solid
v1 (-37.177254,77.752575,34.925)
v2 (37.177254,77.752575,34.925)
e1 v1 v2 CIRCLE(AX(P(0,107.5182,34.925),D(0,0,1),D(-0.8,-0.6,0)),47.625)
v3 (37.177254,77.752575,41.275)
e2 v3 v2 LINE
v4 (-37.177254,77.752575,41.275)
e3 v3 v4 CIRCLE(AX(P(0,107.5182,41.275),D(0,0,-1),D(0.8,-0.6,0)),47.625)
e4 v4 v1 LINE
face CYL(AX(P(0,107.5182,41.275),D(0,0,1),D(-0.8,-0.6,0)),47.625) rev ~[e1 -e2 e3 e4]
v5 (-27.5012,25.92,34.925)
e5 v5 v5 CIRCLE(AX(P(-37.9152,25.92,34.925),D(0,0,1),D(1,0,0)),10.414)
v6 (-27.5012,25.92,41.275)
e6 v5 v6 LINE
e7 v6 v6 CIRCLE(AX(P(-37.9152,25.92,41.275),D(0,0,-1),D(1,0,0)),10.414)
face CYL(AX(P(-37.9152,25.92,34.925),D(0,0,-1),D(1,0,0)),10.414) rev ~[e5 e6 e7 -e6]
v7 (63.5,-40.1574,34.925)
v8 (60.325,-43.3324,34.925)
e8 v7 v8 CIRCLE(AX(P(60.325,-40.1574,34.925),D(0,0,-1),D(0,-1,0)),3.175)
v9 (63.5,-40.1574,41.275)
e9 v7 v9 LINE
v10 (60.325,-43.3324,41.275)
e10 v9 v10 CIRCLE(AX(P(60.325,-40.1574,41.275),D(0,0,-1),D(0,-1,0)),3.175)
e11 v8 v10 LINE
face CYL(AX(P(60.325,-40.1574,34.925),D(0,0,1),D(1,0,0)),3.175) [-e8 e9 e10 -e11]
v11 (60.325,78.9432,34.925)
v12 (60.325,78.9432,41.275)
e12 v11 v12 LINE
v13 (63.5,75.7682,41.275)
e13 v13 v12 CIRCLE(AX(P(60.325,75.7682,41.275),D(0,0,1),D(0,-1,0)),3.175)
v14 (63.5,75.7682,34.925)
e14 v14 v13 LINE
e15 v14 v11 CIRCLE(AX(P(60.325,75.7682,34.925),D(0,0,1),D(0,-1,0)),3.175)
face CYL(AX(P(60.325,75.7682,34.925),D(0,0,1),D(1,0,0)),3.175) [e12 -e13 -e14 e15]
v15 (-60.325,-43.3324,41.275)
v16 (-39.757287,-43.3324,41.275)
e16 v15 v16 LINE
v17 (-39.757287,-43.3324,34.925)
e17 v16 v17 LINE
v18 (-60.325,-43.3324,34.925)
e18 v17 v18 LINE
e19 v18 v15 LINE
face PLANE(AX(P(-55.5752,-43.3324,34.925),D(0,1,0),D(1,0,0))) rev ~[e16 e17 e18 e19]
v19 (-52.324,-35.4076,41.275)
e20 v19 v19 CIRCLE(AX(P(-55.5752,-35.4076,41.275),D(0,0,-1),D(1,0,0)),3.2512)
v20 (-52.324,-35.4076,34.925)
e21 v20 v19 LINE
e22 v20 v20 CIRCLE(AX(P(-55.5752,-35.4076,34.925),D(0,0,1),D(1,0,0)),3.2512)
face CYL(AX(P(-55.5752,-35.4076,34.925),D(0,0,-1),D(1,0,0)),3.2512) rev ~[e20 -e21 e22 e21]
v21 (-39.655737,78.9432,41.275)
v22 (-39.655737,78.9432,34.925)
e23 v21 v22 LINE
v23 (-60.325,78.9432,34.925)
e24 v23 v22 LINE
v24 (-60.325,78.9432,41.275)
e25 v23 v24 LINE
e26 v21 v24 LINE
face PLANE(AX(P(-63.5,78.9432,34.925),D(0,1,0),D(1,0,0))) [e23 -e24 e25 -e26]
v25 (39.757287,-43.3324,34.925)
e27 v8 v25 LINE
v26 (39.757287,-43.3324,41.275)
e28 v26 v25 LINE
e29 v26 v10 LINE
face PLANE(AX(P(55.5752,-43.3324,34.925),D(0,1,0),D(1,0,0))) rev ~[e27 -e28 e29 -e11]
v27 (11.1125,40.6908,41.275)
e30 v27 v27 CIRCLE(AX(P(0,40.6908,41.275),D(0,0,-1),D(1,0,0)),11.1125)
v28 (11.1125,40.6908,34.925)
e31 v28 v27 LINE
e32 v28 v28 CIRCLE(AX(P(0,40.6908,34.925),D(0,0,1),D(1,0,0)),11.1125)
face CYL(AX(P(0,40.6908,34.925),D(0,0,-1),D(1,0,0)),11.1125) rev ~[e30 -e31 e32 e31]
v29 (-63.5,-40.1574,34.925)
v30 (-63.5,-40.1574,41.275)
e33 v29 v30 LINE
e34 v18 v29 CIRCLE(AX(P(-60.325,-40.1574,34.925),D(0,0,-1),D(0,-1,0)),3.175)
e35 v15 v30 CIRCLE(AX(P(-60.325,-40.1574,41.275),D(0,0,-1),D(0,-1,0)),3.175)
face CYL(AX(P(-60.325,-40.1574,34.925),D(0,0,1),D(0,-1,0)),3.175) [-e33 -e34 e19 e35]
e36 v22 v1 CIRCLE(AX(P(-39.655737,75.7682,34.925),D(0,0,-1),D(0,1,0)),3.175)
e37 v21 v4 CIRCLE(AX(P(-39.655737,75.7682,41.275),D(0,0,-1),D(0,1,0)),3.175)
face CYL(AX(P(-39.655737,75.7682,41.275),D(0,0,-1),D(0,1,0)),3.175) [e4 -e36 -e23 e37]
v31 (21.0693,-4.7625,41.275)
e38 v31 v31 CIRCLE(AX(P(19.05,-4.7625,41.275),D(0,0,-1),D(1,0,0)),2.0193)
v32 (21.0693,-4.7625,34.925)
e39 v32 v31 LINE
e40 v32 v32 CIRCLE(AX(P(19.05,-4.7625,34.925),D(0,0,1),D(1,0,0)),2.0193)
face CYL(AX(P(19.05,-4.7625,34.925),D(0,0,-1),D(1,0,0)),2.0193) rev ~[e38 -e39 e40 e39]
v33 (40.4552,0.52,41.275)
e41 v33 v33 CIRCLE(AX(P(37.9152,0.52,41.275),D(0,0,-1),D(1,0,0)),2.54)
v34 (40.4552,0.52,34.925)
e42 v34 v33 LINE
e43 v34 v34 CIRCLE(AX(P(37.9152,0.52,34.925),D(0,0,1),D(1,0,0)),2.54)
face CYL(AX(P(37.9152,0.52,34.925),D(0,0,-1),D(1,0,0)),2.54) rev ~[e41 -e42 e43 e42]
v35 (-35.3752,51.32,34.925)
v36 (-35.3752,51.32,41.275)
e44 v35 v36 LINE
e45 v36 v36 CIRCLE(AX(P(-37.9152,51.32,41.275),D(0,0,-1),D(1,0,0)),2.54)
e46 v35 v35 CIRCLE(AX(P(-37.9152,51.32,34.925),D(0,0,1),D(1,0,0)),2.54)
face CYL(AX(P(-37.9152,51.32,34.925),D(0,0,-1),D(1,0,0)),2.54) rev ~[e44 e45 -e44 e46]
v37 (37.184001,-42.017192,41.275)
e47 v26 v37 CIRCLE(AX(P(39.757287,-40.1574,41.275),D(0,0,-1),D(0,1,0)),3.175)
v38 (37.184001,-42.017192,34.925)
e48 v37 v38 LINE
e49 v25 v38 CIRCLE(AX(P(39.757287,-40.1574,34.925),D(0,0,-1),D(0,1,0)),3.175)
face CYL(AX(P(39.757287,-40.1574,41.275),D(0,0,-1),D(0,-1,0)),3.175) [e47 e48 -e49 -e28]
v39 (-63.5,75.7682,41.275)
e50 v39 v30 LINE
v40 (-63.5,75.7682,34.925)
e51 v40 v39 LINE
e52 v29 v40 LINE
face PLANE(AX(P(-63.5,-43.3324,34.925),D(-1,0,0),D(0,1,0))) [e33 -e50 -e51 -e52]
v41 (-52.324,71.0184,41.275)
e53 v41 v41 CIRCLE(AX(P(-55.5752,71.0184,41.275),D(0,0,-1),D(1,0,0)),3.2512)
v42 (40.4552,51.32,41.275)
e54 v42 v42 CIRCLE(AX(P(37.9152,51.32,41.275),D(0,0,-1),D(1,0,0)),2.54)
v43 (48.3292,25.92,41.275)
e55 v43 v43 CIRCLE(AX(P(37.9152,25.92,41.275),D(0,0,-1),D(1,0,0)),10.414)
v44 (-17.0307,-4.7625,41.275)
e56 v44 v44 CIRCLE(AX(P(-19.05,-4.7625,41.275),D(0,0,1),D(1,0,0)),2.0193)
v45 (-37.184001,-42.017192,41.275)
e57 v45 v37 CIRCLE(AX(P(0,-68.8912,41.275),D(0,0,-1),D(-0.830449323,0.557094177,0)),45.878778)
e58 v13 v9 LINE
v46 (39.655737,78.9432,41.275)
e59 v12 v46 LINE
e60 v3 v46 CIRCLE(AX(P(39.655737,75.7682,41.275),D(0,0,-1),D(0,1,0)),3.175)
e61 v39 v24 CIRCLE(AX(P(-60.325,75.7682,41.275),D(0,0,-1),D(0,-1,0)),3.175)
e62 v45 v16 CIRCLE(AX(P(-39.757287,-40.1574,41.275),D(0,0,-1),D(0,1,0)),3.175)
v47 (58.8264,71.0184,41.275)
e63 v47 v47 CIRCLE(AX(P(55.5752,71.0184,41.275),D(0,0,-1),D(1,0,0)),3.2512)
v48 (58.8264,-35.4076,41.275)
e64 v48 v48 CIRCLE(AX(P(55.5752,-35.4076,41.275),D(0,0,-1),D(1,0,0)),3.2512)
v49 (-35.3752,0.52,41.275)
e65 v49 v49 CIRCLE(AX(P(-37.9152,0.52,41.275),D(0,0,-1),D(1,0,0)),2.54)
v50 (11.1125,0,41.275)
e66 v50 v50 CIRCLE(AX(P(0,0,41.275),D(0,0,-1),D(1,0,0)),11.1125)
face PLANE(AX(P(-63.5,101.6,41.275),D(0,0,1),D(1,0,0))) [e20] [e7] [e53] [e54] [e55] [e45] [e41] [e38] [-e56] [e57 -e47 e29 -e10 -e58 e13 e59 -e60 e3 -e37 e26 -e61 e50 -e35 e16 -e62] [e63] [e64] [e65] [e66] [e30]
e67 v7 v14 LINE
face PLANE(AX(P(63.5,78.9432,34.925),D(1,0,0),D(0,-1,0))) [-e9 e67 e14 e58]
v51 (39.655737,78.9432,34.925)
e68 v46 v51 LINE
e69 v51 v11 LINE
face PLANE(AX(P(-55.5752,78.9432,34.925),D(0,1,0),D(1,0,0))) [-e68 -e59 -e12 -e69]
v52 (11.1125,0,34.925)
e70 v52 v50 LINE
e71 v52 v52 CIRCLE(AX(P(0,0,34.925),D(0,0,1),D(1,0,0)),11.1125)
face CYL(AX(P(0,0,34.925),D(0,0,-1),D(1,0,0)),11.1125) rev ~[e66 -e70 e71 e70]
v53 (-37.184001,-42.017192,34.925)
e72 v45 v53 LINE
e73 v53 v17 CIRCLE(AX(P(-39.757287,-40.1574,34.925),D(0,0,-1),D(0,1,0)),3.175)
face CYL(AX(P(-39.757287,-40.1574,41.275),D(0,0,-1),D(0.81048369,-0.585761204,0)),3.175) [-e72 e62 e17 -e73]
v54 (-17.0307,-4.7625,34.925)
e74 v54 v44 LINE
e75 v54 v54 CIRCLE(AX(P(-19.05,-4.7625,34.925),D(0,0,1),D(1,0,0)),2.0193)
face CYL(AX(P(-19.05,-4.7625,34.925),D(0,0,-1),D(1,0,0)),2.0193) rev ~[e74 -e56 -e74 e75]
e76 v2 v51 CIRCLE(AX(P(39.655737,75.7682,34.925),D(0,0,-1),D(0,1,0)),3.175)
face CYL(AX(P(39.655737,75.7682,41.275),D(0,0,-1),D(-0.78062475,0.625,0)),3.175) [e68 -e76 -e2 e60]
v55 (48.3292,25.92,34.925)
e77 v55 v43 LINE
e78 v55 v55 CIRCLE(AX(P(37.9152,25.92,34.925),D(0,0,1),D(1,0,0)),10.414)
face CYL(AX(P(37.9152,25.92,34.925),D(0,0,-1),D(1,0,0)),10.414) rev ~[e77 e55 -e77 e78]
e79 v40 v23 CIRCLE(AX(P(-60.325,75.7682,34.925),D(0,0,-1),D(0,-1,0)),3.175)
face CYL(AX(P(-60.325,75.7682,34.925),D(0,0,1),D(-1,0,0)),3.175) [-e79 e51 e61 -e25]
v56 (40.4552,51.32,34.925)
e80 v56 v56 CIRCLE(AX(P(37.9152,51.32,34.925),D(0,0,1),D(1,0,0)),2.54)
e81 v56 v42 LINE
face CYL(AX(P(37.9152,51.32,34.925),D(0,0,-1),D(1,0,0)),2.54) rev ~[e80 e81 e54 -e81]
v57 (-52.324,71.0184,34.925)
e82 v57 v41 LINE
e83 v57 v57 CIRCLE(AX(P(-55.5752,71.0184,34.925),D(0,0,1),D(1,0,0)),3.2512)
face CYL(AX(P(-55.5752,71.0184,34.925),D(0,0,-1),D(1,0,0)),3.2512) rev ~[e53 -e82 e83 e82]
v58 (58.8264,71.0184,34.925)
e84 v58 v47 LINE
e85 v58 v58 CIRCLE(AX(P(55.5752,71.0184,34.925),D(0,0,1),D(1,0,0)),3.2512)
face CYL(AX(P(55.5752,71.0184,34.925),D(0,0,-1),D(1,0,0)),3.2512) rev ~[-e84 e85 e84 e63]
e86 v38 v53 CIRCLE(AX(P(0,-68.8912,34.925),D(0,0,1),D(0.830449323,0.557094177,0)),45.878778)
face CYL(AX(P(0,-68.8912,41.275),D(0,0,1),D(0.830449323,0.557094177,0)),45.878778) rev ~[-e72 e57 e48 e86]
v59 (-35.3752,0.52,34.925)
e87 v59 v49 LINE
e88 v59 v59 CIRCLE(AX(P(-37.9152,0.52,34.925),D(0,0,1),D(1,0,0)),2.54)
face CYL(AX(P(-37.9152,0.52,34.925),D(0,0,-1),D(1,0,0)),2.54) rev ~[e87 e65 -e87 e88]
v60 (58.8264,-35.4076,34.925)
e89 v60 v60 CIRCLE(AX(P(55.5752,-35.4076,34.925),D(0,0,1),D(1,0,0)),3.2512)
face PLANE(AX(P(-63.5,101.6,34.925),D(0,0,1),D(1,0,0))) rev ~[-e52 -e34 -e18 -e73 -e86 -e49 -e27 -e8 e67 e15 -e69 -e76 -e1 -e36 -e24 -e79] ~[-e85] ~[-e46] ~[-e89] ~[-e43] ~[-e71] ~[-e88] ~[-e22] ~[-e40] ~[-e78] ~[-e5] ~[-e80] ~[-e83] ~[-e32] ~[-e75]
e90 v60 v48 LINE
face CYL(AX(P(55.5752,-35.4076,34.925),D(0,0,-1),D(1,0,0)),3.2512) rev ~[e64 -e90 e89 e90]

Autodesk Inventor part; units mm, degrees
ref_plane "YZ Plane" through (0, 0, 0) normal (1, 0, 0) x (0, 1, 0)
ref_plane "XZ Plane" through (0, 0, 0) normal (0, 1, 0) x (-1, 0, 0)
ref_plane "XY Plane" through (0, 0, 0) normal (0, 0, 1) x (1, 0, 0)
ref_plane "Work Plane1" through (-63.5, 101.6, 34.925) normal (0, 0, 1) x (1, 0, 0)
sketch "Sketch2" plane through (-63.5, 101.6, 34.925) normal (0, 0, 1) x (1, 0, 0)
  circle A0 centre (63.5, -101.6) radius 11.1125
  circle A1 centre (44.45, -106.3625) radius 2.0193 projected
  circle A2 centre (44.45, -106.3625) radius 2.0193
  circle A3 centre (25.5848, -101.08) radius 2.54 projected
  circle A4 centre (25.5848, -101.08) radius 2.54
  line L0 (44.45, -106.3625) -> (82.55, -106.3625)
  circle A5 centre (82.55, -106.3625) radius 2.0193
  circle A6 centre (101.4152, -101.08) radius 2.54 projected
  line L1 (25.5848, -101.08) -> (101.4152, -101.08)
  circle A7 centre (101.4152, -101.08) radius 2.54
  line L2 (25.5848, -101.08) -> (25.5848, -75.68)
  line L3 (101.4152, -101.08) -> (101.4152, -75.68)
  circle A8 centre (25.5848, -75.68) radius 10.414
  circle A9 centre (101.4152, -75.68) radius 10.414
  circle A10 centre (63.5, -60.9092) radius 11.1125 projected
  line L4 (63.5, -60.9092) -> (63.5, -101.6)
  circle A11 centre (63.5, -60.9092) radius 11.1125
  circle A12 centre (25.5848, -50.28) radius 2.54 projected
  line L5 (25.5848, -50.28) -> (25.5848, -75.68)
  line L6 (101.4152, -75.68) -> (101.4152, -50.28)
  circle A13 centre (25.5848, -50.28) radius 2.54
  circle A14 centre (101.4152, -50.28) radius 2.54
  circle A15 centre (63.5, -101.6) radius 11.1125 projected
  line L7 (127, 0) -> (127, -139.7) projected
  line L8 (0, -139.7) -> (0, 0) projected
  line L9 (0, -144.9324) -> (127, -144.9324)
  line L10 (0, -144.9324) -> (7.9248, -144.9324)
  line L11 (7.9248, -144.9324) -> (7.9248, -137.0076)
  circle A16 centre (7.9248, -137.0076) radius 3.2512
  line L12 (127, -144.9324) -> (119.0752, -144.9324)
  line L13 (119.0752, -144.9324) -> (119.0752, -137.0076)
  circle A17 centre (119.0752, -137.0076) radius 3.2512
  line L14 (0, 0) -> (127, 0) projected
  line L15 (0, -22.6568) -> (127, -22.6568)
  line L16 (0, -22.6568) -> (7.9248, -22.6568)
  line L17 (7.9248, -22.6568) -> (7.9248, -30.5816)
  line L18 (127, -22.6568) -> (119.0752, -22.6568)
  line L19 (119.0752, -22.6568) -> (119.0752, -30.5816)
  circle A18 centre (7.9248, -30.5816) radius 3.2512
  circle A19 centre (119.0752, -30.5816) radius 3.2512
  line L20 (63.5, 0) -> (63.5, -17.78)
  line L21 (0, -144.9324) -> (0, -22.6568)
  line L22 (127, -144.9324) -> (127, -22.6568)
  line L23 (63.5, -101.6) -> (63.5, -106.3625)
  line L24 (63.5, -106.3625) -> (82.55, -106.3625)
  line L25 (82.55, -106.3625) -> (44.45, -106.3625)
  dimension "d0" = 38.1
  dimension "d1" = 25.4
  dimension "d23" = 7.9248
  dimension "d24" = 7.9248
  dimension "d25" = 17.78
  dimension "d27" = 38.2524
  dimension "d29" = 7.9248
  dimension "d30" = 7.9248
  dimension "d31" = 43.3324
extrude "Extrusion1" add sketch "Sketch2" along normal blind 6.35 contours L7 L22 L9 L21 L8 L15
fillet "Fillet1" radius 3.175 4 edges at (-63.5, 78.9432, 38.1) (-63.5, -43.3324, 38.1) (63.5, 78.9432, 38.1) (63.5, -43.3324, 38.1)
sketch "Sketch5" plane through (-63.5, 101.6, 41.275) normal (0, 0, 1) x (1, 0, 0)
  line L0 (3.175, -144.9324) -> (123.825, -144.9324) projected
  line L1 (63.5, -144.9324) -> (25.4, -144.9324)
  line L2 (25.4, -144.9324) -> (101.6, -144.9324)
  line L3 (63.5, -144.9324) -> (63.5, -124.6124)
  arc A0 (101.6, -144.9324) -> (25.4, -144.9324) centre (63.5, -170.4912) ccw
  line L4 (123.825, -22.6568) -> (3.175, -22.6568) projected
  line L5 (25.4, -22.6568) -> (101.6, -22.6568)
  line L6 (63.5, -22.6568) -> (63.5, -41.7068)
  arc A1 (25.4, -22.6568) -> (101.6, -22.6568) centre (63.5, 5.9182) ccw
  line L7 (25.4, -144.9324) -> (101.6, -144.9324)
  arc A2 (101.6, -144.9324) -> (25.4, -144.9324) centre (63.5, -170.4912) ccw
  point P0 (63.5, -101.6)
  dimension "d16" = 38.1
  dimension "d17" = 76.2
  dimension "d18" = 20.32
  dimension "d19" = 19.05
extrude "Extrusion2" cut sketch "Sketch5" against normal blind 25.4
fillet "Fillet2" radius 3.175 4 edges at (-38.1, 78.9432, 38.1) (38.1, 78.9432, 38.1) (38.1, -43.3324, 38.1) (-38.1, -43.3324, 38.1)
properties part number "am-2725+3CIM4U+Motor+Plate+r2" material "Aluminum 6061"
